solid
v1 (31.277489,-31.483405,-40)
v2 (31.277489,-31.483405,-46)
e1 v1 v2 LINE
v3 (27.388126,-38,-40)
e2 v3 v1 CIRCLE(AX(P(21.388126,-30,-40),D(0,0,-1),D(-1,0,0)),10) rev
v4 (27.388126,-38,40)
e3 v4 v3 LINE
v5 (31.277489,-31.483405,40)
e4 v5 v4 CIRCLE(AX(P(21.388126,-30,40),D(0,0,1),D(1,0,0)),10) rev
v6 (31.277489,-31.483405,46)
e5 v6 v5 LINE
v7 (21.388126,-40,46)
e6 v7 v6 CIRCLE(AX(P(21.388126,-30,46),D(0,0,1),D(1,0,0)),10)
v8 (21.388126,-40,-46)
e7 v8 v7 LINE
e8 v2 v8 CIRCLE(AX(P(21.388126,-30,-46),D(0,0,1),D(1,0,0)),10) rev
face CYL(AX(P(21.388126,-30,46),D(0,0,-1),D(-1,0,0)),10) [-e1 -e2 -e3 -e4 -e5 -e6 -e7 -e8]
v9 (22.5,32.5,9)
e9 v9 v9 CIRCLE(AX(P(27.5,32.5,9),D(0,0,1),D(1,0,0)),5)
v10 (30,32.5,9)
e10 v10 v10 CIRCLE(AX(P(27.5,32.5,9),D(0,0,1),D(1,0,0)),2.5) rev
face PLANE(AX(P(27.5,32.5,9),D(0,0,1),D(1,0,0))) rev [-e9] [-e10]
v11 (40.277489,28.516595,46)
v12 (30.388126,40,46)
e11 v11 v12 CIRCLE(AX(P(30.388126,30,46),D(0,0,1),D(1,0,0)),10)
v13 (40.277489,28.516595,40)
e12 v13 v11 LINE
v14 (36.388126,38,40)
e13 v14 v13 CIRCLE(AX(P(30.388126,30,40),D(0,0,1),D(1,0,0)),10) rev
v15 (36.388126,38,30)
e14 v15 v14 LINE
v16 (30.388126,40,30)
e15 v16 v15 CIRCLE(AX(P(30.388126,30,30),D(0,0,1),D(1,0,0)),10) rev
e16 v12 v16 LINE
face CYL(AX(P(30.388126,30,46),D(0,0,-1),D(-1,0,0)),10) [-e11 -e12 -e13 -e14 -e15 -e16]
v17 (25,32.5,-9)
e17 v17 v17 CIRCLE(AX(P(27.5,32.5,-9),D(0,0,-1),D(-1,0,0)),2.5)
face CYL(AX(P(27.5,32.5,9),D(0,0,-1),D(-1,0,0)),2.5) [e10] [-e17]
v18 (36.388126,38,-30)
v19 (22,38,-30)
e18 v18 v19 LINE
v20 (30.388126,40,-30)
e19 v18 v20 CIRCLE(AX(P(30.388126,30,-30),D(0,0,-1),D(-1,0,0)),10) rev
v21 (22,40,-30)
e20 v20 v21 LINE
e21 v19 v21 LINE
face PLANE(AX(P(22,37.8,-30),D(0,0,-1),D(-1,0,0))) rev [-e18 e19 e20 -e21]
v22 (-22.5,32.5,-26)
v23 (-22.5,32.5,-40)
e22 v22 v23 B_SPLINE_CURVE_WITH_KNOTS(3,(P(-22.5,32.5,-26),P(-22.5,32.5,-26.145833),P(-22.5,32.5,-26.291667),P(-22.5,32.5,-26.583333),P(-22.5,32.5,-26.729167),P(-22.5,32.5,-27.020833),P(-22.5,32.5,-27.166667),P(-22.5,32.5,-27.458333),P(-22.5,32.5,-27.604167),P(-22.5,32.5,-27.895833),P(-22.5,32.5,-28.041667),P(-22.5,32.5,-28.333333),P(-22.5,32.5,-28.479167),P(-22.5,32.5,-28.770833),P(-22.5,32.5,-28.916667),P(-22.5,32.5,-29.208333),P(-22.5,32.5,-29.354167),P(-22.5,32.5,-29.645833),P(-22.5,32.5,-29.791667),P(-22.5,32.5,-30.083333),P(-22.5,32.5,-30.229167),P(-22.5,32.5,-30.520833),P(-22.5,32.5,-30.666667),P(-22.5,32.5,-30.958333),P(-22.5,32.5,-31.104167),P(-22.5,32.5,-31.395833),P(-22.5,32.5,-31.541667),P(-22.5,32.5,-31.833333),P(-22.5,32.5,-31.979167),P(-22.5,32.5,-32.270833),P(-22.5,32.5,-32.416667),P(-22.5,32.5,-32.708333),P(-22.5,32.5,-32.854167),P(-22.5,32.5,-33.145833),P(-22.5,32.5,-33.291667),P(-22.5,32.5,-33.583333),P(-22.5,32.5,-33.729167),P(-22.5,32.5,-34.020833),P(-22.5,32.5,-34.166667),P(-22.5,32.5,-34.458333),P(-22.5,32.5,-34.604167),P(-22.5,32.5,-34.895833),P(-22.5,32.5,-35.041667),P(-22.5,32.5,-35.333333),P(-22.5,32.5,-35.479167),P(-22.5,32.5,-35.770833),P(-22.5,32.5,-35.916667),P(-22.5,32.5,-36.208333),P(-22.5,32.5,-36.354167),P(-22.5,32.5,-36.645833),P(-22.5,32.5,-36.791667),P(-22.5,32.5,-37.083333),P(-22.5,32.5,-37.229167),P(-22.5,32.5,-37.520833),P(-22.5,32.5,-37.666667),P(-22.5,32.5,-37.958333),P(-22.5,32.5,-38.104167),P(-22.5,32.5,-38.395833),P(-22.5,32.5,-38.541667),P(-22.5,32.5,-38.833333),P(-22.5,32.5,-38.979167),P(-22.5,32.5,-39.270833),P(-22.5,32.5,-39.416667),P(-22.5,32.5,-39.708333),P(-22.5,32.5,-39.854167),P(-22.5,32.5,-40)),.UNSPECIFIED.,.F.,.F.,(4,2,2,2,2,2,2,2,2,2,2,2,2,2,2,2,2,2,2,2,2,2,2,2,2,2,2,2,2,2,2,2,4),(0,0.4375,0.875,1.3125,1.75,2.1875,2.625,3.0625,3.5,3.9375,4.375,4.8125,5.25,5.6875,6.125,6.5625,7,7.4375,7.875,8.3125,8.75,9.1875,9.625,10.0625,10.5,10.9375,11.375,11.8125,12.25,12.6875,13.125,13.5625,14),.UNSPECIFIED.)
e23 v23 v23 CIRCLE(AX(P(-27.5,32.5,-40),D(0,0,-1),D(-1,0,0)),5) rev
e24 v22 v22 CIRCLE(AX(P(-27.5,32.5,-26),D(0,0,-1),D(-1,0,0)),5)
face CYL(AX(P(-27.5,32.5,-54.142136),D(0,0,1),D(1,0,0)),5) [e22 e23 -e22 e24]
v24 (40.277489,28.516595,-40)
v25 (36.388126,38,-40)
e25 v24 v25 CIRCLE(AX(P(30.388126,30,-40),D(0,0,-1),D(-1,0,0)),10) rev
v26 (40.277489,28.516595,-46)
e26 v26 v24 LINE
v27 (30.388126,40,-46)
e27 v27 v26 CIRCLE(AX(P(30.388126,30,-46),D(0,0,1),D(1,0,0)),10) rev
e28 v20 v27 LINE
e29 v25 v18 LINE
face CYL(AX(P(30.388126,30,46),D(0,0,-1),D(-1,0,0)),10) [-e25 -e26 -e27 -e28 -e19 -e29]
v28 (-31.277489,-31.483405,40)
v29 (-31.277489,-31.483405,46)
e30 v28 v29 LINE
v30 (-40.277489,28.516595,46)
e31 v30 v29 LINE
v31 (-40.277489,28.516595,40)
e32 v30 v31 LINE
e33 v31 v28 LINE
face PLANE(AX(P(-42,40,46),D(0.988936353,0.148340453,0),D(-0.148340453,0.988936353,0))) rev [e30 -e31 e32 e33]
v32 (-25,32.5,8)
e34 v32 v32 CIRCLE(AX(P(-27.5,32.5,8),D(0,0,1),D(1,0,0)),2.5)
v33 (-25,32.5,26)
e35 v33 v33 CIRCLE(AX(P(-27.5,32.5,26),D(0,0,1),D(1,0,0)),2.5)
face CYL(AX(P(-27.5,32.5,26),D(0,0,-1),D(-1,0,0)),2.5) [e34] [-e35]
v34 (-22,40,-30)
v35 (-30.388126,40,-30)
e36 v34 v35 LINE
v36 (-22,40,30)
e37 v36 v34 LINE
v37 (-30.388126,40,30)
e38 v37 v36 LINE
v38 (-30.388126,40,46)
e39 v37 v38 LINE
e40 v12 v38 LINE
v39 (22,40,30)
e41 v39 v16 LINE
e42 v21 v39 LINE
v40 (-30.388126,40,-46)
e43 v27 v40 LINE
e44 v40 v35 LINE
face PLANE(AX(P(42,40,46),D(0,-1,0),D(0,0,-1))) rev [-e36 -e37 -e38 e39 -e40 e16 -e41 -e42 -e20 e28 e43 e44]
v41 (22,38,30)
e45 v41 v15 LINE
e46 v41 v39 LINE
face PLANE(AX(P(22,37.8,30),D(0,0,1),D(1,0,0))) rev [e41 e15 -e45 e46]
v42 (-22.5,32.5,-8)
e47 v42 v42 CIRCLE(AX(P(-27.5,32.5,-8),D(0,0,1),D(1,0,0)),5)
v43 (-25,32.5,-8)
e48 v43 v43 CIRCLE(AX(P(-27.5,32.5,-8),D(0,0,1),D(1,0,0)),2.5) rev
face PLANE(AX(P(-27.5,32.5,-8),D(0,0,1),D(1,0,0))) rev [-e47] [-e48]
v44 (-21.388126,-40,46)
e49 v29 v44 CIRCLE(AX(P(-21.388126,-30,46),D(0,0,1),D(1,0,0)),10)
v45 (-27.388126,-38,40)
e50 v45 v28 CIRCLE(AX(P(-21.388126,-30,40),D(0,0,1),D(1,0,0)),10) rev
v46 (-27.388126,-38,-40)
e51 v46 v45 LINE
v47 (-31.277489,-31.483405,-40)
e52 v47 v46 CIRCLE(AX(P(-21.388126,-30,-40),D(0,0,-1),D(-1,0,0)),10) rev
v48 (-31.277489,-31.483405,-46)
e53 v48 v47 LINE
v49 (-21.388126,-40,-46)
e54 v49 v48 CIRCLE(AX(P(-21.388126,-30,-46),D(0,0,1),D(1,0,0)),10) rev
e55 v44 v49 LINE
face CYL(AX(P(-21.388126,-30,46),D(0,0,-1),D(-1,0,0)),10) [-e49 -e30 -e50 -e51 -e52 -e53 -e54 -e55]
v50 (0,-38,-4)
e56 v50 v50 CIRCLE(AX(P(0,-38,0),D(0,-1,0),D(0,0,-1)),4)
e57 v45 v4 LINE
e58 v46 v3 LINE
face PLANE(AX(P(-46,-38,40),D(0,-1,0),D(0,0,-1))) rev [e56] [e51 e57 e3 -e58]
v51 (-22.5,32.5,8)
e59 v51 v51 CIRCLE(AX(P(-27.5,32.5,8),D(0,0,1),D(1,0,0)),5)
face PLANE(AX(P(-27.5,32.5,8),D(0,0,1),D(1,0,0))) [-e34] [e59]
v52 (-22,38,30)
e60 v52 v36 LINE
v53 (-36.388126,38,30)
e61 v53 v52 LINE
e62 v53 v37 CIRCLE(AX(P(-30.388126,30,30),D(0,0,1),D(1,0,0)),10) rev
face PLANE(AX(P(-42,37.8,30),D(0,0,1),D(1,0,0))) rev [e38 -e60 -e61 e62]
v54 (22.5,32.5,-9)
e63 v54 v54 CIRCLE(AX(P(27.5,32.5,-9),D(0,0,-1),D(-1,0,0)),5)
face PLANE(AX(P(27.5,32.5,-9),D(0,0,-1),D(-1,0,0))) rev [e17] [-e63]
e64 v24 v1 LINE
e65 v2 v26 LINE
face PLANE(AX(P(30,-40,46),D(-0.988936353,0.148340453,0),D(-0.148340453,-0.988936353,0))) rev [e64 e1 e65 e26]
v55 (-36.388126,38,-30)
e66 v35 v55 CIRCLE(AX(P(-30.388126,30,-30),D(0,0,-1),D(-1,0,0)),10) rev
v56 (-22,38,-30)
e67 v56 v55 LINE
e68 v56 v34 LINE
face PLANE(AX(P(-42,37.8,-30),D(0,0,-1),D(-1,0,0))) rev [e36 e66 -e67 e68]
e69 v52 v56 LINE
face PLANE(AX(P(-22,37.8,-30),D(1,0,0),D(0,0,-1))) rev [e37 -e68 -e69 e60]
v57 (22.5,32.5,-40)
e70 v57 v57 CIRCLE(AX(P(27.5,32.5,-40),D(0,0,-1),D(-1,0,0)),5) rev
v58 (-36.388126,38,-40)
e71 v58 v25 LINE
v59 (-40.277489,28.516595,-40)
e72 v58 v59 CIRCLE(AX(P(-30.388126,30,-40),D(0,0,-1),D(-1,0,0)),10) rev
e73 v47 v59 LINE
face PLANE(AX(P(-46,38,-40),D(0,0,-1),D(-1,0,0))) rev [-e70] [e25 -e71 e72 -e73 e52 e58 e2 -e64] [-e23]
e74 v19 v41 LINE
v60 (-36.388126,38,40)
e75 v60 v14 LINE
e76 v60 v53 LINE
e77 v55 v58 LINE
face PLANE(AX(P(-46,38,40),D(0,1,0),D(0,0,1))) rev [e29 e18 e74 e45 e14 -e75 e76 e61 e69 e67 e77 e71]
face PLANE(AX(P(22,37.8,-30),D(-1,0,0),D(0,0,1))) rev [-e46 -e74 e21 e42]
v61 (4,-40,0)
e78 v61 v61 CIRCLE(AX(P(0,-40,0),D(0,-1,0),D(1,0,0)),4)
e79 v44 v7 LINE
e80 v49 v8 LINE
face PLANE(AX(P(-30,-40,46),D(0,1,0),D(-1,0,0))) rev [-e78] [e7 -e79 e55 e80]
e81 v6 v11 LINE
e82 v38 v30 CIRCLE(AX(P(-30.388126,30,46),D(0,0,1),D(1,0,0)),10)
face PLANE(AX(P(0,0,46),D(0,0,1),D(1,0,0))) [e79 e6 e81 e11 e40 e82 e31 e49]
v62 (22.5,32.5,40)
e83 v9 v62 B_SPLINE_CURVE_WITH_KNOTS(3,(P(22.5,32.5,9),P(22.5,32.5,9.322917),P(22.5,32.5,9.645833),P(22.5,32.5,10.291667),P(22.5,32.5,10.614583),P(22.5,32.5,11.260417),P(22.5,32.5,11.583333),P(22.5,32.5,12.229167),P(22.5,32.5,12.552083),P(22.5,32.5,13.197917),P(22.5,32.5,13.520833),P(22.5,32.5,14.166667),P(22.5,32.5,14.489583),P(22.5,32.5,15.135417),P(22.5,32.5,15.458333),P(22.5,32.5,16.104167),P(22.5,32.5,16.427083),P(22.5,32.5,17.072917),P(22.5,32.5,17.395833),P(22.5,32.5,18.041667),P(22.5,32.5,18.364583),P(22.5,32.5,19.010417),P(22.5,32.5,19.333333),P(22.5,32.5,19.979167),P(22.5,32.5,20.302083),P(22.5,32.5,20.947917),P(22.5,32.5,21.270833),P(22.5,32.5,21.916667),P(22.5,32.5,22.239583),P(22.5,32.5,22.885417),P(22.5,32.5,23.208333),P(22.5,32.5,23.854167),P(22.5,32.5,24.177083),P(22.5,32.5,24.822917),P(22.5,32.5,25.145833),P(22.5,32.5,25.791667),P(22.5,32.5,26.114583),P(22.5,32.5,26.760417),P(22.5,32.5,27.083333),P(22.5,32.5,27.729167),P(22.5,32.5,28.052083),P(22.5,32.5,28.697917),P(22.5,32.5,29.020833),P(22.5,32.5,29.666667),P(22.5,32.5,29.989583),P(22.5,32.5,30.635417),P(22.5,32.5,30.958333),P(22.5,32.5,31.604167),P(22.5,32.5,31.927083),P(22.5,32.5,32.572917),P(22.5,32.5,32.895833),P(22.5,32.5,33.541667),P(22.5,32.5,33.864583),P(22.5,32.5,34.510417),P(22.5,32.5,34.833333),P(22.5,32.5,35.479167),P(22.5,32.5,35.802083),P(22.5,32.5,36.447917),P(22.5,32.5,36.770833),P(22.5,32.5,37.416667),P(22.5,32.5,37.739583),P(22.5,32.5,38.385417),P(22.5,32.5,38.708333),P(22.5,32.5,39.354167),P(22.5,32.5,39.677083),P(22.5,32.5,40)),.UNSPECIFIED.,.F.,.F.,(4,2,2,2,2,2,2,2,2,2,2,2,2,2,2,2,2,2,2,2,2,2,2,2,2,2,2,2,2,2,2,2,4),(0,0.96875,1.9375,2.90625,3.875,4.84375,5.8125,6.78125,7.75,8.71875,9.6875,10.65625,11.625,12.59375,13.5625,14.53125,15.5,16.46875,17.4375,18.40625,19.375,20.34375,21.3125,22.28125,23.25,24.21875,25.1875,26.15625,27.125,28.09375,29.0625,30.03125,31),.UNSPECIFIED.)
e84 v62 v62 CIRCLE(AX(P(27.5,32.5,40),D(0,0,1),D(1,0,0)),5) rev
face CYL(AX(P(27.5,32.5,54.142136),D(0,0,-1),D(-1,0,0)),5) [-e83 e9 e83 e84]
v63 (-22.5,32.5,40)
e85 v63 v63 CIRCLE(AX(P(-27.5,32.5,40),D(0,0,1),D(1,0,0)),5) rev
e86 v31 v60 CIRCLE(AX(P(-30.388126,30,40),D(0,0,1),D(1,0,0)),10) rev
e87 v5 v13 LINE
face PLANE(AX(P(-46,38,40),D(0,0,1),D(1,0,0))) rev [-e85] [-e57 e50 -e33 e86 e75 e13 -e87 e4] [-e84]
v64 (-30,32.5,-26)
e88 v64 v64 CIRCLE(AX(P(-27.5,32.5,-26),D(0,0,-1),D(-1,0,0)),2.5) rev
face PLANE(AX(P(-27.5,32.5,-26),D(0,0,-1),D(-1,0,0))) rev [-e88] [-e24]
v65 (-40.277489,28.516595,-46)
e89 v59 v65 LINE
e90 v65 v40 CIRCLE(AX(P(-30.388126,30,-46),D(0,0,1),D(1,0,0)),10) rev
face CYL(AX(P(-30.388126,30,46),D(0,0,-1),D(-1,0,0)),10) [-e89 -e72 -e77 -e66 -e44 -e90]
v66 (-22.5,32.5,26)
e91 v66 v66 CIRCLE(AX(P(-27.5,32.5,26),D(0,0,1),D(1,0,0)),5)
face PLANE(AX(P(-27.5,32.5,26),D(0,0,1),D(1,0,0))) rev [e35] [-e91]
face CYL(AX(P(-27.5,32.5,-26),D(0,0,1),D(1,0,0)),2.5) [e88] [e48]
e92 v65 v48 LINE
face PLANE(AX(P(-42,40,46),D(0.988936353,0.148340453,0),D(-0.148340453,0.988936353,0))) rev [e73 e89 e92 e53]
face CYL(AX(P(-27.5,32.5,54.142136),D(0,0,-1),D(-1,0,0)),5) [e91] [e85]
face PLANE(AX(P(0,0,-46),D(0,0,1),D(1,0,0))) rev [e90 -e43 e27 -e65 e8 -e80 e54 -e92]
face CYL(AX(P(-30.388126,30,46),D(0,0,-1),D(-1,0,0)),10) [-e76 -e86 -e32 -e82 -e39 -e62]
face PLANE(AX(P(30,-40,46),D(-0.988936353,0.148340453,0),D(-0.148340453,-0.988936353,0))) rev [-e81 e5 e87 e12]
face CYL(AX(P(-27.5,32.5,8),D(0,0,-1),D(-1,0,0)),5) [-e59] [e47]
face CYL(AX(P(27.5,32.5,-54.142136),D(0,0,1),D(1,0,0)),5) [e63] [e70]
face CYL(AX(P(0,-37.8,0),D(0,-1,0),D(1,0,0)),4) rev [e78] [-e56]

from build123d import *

# Parameters (mm, degrees)
BOSS_EXTRUDE1_DEPTH = 46
SKETCH4_W           = 80
SKETCH4_H           = 76
CUT_EXTRUDE1_DEPTH  = 46
SKETCH5_R           = 5
BOSS_EXTRUDE2_DEPTH = 8
SKETCH6_R           = 2.5
BOSS_EXTRUDE3_DEPTH = 18
SKETCH8_R           = 2.5
BOSS_EXTRUDE4_DEPTH = 18
SKETCH9_R           = 5
BOSS_EXTRUDE5_DEPTH = 14
BOSS_EXTRUDE6_START = 14
SKETCH10_R          = 5
BOSS_EXTRUDE6_DEPTH = 14
SKETCH11_R          = 2.5
BOSS_EXTRUDE7_DEPTH = 9
SKETCH12_R          = 5
BOSS_EXTRUDE8_DEPTH = 31
BOSS_EXTRUDE9_START = 31
SKETCH13_R          = 5
BOSS_EXTRUDE9_DEPTH = 31
SKETCH14_W          = 20
SKETCH14_H          = 60
CUT_EXTRUDE2_DEPTH  = 2.2
FILLET1_R           = 10
FILLET2_R           = 10
SKETCH15_R          = 4
CUT_EXTRUDE3_DEPTH  = 2.2


with BuildPart() as part:
    # Sketch3 → Boss-Extrude1 (new, symmetric)
    with BuildSketch(Plane.XY):
        Polygon((42, 40), (-42, 40), (-30, -40), (30, -40), align=None)
    extrude(amount=BOSS_EXTRUDE1_DEPTH, both=True)

    # Sketch4 → Cut-Extrude1 (cut, symmetric)
    with BuildSketch(Plane(origin=(0, 0, 0), x_dir=(0, 0, -1), z_dir=(1, 0, 0))):
        Rectangle(SKETCH4_W, SKETCH4_H)
    extrude(amount=CUT_EXTRUDE1_DEPTH, both=True, mode=Mode.SUBTRACT)



with BuildPart() as body_2:
    # Sketch5 → Boss-Extrude2 (new, symmetric)
    with BuildSketch(Plane.XY):
        with Locations((-27.5, 32.5)):
            Circle(SKETCH5_R)
    extrude(amount=BOSS_EXTRUDE2_DEPTH, both=True)

    # Sketch6 → Boss-Extrude3 (add)
    with BuildSketch(Plane.XY.offset(8)):
        with Locations((-27.5, 32.5)):
            Circle(SKETCH6_R)
    extrude(amount=BOSS_EXTRUDE3_DEPTH)

    # Sketch8 → Boss-Extrude4 (add)
    with BuildSketch(Plane(origin=(0, 0, -8), x_dir=(-1, 0, 0), z_dir=(0, 0, -1))):
        with Locations(Location((27.5, 32.5, 0), (0, 0, 180))):
            Circle(SKETCH8_R)
    extrude(amount=BOSS_EXTRUDE4_DEPTH)


with BuildPart() as part_1:
    add(part.part)

    add(body_2.part)  # Boss-Extrude5 merges body 2
    # Sketch9 → Boss-Extrude5 (add)
    with BuildSketch(Plane(origin=(0, 0, -26), x_dir=(-1, 0, 0), z_dir=(0, 0, -1))):
        with Locations(Location((27.5, 32.5, 0), (0, 0, 180))):
            Circle(SKETCH9_R)
    extrude(amount=BOSS_EXTRUDE5_DEPTH)

    # Sketch10 → Boss-Extrude6 (add)
    with BuildSketch(Plane.XY.offset(26).offset(BOSS_EXTRUDE6_START)):
        with Locations((-27.5, 32.5)):
            Circle(SKETCH10_R)
    extrude(amount=-BOSS_EXTRUDE6_DEPTH)



with BuildPart() as body_2_2:
    # Sketch11 → Boss-Extrude7 (new, symmetric)
    with BuildSketch(Plane.XY):
        with Locations((27.5, 32.5)):
            Circle(SKETCH11_R)
    extrude(amount=BOSS_EXTRUDE7_DEPTH, both=True)


with BuildPart() as part_2:
    add(part_1.part)

    add(body_2_2.part)  # Boss-Extrude8 merges body 2 2
    # Sketch12 → Boss-Extrude8 (add)
    with BuildSketch(Plane.XY.offset(9)):
        with Locations(Location((27.5, 32.5, 0), (0, 0, 180))):
            Circle(SKETCH12_R)
    extrude(amount=BOSS_EXTRUDE8_DEPTH)

    # Sketch13 → Boss-Extrude9 (add)
    with BuildSketch(Plane(origin=(0, 0, -9), x_dir=(-1, 0, 0), z_dir=(0, 0, -1)).offset(BOSS_EXTRUDE9_START)):
        with Locations((-27.5, 32.5)):
            Circle(SKETCH13_R)
    extrude(amount=-BOSS_EXTRUDE9_DEPTH)

    # Sketch14 → Cut-Extrude2 (cut)
    with BuildSketch(Plane(origin=(0, 40, 0), x_dir=(1, 0, 0), z_dir=(0, 1, 0))):
        with Locations((32, 0)):
            Rectangle(SKETCH14_W, SKETCH14_H)
        with Locations((-32, 0)):
            Rectangle(SKETCH14_W, SKETCH14_H)
    extrude(amount=-CUT_EXTRUDE2_DEPTH, mode=Mode.SUBTRACT)

    # Fillet1
    fillet1_edges = [part_2.edges().sort_by_distance(p)[0] for p in [
        (42, 40, 38),
        (-42, 40, 38),
        (-42, 40, -38),
        (42, 40, -38),
    ]]
    fillet(fillet1_edges, radius=FILLET1_R)

    # Fillet2
    # the kernel refuses this fillet: 10 mm, written as the material it takes off along each edge
    with BuildSketch(Plane(origin=(-30, -40, -67.52968552), x_dir=(-0.1483404529302443, 0.9889363528682976, 0), z_dir=(0, 0, 1)), Plane(origin=(30, -40, 67.52968552), x_dir=(0.14834045293024473, 0.9889363528682976, 0), z_dir=(0, 0, -1))) as fillet2_piece_1:
        with BuildLine():
            CenterArc((FILLET2_R * 0.861187420808, -FILLET2_R), FILLET2_R, 90, 81.46923439)
            Line((-FILLET2_R * 0.12774893206, -FILLET2_R * 0.85165954707), (0, 0))
            Line((0, 0), (FILLET2_R * 0.861187420808, 0))
        make_face()
    extrude(amount=135.05937104, mode=Mode.SUBTRACT)

    # Sketch15 → Cut-Extrude3 (cut)
    with BuildSketch(Plane.XZ.offset(40)):
        Circle(SKETCH15_R)
    extrude(amount=-CUT_EXTRUDE3_DEPTH, mode=Mode.SUBTRACT)


solid = part_2.part
